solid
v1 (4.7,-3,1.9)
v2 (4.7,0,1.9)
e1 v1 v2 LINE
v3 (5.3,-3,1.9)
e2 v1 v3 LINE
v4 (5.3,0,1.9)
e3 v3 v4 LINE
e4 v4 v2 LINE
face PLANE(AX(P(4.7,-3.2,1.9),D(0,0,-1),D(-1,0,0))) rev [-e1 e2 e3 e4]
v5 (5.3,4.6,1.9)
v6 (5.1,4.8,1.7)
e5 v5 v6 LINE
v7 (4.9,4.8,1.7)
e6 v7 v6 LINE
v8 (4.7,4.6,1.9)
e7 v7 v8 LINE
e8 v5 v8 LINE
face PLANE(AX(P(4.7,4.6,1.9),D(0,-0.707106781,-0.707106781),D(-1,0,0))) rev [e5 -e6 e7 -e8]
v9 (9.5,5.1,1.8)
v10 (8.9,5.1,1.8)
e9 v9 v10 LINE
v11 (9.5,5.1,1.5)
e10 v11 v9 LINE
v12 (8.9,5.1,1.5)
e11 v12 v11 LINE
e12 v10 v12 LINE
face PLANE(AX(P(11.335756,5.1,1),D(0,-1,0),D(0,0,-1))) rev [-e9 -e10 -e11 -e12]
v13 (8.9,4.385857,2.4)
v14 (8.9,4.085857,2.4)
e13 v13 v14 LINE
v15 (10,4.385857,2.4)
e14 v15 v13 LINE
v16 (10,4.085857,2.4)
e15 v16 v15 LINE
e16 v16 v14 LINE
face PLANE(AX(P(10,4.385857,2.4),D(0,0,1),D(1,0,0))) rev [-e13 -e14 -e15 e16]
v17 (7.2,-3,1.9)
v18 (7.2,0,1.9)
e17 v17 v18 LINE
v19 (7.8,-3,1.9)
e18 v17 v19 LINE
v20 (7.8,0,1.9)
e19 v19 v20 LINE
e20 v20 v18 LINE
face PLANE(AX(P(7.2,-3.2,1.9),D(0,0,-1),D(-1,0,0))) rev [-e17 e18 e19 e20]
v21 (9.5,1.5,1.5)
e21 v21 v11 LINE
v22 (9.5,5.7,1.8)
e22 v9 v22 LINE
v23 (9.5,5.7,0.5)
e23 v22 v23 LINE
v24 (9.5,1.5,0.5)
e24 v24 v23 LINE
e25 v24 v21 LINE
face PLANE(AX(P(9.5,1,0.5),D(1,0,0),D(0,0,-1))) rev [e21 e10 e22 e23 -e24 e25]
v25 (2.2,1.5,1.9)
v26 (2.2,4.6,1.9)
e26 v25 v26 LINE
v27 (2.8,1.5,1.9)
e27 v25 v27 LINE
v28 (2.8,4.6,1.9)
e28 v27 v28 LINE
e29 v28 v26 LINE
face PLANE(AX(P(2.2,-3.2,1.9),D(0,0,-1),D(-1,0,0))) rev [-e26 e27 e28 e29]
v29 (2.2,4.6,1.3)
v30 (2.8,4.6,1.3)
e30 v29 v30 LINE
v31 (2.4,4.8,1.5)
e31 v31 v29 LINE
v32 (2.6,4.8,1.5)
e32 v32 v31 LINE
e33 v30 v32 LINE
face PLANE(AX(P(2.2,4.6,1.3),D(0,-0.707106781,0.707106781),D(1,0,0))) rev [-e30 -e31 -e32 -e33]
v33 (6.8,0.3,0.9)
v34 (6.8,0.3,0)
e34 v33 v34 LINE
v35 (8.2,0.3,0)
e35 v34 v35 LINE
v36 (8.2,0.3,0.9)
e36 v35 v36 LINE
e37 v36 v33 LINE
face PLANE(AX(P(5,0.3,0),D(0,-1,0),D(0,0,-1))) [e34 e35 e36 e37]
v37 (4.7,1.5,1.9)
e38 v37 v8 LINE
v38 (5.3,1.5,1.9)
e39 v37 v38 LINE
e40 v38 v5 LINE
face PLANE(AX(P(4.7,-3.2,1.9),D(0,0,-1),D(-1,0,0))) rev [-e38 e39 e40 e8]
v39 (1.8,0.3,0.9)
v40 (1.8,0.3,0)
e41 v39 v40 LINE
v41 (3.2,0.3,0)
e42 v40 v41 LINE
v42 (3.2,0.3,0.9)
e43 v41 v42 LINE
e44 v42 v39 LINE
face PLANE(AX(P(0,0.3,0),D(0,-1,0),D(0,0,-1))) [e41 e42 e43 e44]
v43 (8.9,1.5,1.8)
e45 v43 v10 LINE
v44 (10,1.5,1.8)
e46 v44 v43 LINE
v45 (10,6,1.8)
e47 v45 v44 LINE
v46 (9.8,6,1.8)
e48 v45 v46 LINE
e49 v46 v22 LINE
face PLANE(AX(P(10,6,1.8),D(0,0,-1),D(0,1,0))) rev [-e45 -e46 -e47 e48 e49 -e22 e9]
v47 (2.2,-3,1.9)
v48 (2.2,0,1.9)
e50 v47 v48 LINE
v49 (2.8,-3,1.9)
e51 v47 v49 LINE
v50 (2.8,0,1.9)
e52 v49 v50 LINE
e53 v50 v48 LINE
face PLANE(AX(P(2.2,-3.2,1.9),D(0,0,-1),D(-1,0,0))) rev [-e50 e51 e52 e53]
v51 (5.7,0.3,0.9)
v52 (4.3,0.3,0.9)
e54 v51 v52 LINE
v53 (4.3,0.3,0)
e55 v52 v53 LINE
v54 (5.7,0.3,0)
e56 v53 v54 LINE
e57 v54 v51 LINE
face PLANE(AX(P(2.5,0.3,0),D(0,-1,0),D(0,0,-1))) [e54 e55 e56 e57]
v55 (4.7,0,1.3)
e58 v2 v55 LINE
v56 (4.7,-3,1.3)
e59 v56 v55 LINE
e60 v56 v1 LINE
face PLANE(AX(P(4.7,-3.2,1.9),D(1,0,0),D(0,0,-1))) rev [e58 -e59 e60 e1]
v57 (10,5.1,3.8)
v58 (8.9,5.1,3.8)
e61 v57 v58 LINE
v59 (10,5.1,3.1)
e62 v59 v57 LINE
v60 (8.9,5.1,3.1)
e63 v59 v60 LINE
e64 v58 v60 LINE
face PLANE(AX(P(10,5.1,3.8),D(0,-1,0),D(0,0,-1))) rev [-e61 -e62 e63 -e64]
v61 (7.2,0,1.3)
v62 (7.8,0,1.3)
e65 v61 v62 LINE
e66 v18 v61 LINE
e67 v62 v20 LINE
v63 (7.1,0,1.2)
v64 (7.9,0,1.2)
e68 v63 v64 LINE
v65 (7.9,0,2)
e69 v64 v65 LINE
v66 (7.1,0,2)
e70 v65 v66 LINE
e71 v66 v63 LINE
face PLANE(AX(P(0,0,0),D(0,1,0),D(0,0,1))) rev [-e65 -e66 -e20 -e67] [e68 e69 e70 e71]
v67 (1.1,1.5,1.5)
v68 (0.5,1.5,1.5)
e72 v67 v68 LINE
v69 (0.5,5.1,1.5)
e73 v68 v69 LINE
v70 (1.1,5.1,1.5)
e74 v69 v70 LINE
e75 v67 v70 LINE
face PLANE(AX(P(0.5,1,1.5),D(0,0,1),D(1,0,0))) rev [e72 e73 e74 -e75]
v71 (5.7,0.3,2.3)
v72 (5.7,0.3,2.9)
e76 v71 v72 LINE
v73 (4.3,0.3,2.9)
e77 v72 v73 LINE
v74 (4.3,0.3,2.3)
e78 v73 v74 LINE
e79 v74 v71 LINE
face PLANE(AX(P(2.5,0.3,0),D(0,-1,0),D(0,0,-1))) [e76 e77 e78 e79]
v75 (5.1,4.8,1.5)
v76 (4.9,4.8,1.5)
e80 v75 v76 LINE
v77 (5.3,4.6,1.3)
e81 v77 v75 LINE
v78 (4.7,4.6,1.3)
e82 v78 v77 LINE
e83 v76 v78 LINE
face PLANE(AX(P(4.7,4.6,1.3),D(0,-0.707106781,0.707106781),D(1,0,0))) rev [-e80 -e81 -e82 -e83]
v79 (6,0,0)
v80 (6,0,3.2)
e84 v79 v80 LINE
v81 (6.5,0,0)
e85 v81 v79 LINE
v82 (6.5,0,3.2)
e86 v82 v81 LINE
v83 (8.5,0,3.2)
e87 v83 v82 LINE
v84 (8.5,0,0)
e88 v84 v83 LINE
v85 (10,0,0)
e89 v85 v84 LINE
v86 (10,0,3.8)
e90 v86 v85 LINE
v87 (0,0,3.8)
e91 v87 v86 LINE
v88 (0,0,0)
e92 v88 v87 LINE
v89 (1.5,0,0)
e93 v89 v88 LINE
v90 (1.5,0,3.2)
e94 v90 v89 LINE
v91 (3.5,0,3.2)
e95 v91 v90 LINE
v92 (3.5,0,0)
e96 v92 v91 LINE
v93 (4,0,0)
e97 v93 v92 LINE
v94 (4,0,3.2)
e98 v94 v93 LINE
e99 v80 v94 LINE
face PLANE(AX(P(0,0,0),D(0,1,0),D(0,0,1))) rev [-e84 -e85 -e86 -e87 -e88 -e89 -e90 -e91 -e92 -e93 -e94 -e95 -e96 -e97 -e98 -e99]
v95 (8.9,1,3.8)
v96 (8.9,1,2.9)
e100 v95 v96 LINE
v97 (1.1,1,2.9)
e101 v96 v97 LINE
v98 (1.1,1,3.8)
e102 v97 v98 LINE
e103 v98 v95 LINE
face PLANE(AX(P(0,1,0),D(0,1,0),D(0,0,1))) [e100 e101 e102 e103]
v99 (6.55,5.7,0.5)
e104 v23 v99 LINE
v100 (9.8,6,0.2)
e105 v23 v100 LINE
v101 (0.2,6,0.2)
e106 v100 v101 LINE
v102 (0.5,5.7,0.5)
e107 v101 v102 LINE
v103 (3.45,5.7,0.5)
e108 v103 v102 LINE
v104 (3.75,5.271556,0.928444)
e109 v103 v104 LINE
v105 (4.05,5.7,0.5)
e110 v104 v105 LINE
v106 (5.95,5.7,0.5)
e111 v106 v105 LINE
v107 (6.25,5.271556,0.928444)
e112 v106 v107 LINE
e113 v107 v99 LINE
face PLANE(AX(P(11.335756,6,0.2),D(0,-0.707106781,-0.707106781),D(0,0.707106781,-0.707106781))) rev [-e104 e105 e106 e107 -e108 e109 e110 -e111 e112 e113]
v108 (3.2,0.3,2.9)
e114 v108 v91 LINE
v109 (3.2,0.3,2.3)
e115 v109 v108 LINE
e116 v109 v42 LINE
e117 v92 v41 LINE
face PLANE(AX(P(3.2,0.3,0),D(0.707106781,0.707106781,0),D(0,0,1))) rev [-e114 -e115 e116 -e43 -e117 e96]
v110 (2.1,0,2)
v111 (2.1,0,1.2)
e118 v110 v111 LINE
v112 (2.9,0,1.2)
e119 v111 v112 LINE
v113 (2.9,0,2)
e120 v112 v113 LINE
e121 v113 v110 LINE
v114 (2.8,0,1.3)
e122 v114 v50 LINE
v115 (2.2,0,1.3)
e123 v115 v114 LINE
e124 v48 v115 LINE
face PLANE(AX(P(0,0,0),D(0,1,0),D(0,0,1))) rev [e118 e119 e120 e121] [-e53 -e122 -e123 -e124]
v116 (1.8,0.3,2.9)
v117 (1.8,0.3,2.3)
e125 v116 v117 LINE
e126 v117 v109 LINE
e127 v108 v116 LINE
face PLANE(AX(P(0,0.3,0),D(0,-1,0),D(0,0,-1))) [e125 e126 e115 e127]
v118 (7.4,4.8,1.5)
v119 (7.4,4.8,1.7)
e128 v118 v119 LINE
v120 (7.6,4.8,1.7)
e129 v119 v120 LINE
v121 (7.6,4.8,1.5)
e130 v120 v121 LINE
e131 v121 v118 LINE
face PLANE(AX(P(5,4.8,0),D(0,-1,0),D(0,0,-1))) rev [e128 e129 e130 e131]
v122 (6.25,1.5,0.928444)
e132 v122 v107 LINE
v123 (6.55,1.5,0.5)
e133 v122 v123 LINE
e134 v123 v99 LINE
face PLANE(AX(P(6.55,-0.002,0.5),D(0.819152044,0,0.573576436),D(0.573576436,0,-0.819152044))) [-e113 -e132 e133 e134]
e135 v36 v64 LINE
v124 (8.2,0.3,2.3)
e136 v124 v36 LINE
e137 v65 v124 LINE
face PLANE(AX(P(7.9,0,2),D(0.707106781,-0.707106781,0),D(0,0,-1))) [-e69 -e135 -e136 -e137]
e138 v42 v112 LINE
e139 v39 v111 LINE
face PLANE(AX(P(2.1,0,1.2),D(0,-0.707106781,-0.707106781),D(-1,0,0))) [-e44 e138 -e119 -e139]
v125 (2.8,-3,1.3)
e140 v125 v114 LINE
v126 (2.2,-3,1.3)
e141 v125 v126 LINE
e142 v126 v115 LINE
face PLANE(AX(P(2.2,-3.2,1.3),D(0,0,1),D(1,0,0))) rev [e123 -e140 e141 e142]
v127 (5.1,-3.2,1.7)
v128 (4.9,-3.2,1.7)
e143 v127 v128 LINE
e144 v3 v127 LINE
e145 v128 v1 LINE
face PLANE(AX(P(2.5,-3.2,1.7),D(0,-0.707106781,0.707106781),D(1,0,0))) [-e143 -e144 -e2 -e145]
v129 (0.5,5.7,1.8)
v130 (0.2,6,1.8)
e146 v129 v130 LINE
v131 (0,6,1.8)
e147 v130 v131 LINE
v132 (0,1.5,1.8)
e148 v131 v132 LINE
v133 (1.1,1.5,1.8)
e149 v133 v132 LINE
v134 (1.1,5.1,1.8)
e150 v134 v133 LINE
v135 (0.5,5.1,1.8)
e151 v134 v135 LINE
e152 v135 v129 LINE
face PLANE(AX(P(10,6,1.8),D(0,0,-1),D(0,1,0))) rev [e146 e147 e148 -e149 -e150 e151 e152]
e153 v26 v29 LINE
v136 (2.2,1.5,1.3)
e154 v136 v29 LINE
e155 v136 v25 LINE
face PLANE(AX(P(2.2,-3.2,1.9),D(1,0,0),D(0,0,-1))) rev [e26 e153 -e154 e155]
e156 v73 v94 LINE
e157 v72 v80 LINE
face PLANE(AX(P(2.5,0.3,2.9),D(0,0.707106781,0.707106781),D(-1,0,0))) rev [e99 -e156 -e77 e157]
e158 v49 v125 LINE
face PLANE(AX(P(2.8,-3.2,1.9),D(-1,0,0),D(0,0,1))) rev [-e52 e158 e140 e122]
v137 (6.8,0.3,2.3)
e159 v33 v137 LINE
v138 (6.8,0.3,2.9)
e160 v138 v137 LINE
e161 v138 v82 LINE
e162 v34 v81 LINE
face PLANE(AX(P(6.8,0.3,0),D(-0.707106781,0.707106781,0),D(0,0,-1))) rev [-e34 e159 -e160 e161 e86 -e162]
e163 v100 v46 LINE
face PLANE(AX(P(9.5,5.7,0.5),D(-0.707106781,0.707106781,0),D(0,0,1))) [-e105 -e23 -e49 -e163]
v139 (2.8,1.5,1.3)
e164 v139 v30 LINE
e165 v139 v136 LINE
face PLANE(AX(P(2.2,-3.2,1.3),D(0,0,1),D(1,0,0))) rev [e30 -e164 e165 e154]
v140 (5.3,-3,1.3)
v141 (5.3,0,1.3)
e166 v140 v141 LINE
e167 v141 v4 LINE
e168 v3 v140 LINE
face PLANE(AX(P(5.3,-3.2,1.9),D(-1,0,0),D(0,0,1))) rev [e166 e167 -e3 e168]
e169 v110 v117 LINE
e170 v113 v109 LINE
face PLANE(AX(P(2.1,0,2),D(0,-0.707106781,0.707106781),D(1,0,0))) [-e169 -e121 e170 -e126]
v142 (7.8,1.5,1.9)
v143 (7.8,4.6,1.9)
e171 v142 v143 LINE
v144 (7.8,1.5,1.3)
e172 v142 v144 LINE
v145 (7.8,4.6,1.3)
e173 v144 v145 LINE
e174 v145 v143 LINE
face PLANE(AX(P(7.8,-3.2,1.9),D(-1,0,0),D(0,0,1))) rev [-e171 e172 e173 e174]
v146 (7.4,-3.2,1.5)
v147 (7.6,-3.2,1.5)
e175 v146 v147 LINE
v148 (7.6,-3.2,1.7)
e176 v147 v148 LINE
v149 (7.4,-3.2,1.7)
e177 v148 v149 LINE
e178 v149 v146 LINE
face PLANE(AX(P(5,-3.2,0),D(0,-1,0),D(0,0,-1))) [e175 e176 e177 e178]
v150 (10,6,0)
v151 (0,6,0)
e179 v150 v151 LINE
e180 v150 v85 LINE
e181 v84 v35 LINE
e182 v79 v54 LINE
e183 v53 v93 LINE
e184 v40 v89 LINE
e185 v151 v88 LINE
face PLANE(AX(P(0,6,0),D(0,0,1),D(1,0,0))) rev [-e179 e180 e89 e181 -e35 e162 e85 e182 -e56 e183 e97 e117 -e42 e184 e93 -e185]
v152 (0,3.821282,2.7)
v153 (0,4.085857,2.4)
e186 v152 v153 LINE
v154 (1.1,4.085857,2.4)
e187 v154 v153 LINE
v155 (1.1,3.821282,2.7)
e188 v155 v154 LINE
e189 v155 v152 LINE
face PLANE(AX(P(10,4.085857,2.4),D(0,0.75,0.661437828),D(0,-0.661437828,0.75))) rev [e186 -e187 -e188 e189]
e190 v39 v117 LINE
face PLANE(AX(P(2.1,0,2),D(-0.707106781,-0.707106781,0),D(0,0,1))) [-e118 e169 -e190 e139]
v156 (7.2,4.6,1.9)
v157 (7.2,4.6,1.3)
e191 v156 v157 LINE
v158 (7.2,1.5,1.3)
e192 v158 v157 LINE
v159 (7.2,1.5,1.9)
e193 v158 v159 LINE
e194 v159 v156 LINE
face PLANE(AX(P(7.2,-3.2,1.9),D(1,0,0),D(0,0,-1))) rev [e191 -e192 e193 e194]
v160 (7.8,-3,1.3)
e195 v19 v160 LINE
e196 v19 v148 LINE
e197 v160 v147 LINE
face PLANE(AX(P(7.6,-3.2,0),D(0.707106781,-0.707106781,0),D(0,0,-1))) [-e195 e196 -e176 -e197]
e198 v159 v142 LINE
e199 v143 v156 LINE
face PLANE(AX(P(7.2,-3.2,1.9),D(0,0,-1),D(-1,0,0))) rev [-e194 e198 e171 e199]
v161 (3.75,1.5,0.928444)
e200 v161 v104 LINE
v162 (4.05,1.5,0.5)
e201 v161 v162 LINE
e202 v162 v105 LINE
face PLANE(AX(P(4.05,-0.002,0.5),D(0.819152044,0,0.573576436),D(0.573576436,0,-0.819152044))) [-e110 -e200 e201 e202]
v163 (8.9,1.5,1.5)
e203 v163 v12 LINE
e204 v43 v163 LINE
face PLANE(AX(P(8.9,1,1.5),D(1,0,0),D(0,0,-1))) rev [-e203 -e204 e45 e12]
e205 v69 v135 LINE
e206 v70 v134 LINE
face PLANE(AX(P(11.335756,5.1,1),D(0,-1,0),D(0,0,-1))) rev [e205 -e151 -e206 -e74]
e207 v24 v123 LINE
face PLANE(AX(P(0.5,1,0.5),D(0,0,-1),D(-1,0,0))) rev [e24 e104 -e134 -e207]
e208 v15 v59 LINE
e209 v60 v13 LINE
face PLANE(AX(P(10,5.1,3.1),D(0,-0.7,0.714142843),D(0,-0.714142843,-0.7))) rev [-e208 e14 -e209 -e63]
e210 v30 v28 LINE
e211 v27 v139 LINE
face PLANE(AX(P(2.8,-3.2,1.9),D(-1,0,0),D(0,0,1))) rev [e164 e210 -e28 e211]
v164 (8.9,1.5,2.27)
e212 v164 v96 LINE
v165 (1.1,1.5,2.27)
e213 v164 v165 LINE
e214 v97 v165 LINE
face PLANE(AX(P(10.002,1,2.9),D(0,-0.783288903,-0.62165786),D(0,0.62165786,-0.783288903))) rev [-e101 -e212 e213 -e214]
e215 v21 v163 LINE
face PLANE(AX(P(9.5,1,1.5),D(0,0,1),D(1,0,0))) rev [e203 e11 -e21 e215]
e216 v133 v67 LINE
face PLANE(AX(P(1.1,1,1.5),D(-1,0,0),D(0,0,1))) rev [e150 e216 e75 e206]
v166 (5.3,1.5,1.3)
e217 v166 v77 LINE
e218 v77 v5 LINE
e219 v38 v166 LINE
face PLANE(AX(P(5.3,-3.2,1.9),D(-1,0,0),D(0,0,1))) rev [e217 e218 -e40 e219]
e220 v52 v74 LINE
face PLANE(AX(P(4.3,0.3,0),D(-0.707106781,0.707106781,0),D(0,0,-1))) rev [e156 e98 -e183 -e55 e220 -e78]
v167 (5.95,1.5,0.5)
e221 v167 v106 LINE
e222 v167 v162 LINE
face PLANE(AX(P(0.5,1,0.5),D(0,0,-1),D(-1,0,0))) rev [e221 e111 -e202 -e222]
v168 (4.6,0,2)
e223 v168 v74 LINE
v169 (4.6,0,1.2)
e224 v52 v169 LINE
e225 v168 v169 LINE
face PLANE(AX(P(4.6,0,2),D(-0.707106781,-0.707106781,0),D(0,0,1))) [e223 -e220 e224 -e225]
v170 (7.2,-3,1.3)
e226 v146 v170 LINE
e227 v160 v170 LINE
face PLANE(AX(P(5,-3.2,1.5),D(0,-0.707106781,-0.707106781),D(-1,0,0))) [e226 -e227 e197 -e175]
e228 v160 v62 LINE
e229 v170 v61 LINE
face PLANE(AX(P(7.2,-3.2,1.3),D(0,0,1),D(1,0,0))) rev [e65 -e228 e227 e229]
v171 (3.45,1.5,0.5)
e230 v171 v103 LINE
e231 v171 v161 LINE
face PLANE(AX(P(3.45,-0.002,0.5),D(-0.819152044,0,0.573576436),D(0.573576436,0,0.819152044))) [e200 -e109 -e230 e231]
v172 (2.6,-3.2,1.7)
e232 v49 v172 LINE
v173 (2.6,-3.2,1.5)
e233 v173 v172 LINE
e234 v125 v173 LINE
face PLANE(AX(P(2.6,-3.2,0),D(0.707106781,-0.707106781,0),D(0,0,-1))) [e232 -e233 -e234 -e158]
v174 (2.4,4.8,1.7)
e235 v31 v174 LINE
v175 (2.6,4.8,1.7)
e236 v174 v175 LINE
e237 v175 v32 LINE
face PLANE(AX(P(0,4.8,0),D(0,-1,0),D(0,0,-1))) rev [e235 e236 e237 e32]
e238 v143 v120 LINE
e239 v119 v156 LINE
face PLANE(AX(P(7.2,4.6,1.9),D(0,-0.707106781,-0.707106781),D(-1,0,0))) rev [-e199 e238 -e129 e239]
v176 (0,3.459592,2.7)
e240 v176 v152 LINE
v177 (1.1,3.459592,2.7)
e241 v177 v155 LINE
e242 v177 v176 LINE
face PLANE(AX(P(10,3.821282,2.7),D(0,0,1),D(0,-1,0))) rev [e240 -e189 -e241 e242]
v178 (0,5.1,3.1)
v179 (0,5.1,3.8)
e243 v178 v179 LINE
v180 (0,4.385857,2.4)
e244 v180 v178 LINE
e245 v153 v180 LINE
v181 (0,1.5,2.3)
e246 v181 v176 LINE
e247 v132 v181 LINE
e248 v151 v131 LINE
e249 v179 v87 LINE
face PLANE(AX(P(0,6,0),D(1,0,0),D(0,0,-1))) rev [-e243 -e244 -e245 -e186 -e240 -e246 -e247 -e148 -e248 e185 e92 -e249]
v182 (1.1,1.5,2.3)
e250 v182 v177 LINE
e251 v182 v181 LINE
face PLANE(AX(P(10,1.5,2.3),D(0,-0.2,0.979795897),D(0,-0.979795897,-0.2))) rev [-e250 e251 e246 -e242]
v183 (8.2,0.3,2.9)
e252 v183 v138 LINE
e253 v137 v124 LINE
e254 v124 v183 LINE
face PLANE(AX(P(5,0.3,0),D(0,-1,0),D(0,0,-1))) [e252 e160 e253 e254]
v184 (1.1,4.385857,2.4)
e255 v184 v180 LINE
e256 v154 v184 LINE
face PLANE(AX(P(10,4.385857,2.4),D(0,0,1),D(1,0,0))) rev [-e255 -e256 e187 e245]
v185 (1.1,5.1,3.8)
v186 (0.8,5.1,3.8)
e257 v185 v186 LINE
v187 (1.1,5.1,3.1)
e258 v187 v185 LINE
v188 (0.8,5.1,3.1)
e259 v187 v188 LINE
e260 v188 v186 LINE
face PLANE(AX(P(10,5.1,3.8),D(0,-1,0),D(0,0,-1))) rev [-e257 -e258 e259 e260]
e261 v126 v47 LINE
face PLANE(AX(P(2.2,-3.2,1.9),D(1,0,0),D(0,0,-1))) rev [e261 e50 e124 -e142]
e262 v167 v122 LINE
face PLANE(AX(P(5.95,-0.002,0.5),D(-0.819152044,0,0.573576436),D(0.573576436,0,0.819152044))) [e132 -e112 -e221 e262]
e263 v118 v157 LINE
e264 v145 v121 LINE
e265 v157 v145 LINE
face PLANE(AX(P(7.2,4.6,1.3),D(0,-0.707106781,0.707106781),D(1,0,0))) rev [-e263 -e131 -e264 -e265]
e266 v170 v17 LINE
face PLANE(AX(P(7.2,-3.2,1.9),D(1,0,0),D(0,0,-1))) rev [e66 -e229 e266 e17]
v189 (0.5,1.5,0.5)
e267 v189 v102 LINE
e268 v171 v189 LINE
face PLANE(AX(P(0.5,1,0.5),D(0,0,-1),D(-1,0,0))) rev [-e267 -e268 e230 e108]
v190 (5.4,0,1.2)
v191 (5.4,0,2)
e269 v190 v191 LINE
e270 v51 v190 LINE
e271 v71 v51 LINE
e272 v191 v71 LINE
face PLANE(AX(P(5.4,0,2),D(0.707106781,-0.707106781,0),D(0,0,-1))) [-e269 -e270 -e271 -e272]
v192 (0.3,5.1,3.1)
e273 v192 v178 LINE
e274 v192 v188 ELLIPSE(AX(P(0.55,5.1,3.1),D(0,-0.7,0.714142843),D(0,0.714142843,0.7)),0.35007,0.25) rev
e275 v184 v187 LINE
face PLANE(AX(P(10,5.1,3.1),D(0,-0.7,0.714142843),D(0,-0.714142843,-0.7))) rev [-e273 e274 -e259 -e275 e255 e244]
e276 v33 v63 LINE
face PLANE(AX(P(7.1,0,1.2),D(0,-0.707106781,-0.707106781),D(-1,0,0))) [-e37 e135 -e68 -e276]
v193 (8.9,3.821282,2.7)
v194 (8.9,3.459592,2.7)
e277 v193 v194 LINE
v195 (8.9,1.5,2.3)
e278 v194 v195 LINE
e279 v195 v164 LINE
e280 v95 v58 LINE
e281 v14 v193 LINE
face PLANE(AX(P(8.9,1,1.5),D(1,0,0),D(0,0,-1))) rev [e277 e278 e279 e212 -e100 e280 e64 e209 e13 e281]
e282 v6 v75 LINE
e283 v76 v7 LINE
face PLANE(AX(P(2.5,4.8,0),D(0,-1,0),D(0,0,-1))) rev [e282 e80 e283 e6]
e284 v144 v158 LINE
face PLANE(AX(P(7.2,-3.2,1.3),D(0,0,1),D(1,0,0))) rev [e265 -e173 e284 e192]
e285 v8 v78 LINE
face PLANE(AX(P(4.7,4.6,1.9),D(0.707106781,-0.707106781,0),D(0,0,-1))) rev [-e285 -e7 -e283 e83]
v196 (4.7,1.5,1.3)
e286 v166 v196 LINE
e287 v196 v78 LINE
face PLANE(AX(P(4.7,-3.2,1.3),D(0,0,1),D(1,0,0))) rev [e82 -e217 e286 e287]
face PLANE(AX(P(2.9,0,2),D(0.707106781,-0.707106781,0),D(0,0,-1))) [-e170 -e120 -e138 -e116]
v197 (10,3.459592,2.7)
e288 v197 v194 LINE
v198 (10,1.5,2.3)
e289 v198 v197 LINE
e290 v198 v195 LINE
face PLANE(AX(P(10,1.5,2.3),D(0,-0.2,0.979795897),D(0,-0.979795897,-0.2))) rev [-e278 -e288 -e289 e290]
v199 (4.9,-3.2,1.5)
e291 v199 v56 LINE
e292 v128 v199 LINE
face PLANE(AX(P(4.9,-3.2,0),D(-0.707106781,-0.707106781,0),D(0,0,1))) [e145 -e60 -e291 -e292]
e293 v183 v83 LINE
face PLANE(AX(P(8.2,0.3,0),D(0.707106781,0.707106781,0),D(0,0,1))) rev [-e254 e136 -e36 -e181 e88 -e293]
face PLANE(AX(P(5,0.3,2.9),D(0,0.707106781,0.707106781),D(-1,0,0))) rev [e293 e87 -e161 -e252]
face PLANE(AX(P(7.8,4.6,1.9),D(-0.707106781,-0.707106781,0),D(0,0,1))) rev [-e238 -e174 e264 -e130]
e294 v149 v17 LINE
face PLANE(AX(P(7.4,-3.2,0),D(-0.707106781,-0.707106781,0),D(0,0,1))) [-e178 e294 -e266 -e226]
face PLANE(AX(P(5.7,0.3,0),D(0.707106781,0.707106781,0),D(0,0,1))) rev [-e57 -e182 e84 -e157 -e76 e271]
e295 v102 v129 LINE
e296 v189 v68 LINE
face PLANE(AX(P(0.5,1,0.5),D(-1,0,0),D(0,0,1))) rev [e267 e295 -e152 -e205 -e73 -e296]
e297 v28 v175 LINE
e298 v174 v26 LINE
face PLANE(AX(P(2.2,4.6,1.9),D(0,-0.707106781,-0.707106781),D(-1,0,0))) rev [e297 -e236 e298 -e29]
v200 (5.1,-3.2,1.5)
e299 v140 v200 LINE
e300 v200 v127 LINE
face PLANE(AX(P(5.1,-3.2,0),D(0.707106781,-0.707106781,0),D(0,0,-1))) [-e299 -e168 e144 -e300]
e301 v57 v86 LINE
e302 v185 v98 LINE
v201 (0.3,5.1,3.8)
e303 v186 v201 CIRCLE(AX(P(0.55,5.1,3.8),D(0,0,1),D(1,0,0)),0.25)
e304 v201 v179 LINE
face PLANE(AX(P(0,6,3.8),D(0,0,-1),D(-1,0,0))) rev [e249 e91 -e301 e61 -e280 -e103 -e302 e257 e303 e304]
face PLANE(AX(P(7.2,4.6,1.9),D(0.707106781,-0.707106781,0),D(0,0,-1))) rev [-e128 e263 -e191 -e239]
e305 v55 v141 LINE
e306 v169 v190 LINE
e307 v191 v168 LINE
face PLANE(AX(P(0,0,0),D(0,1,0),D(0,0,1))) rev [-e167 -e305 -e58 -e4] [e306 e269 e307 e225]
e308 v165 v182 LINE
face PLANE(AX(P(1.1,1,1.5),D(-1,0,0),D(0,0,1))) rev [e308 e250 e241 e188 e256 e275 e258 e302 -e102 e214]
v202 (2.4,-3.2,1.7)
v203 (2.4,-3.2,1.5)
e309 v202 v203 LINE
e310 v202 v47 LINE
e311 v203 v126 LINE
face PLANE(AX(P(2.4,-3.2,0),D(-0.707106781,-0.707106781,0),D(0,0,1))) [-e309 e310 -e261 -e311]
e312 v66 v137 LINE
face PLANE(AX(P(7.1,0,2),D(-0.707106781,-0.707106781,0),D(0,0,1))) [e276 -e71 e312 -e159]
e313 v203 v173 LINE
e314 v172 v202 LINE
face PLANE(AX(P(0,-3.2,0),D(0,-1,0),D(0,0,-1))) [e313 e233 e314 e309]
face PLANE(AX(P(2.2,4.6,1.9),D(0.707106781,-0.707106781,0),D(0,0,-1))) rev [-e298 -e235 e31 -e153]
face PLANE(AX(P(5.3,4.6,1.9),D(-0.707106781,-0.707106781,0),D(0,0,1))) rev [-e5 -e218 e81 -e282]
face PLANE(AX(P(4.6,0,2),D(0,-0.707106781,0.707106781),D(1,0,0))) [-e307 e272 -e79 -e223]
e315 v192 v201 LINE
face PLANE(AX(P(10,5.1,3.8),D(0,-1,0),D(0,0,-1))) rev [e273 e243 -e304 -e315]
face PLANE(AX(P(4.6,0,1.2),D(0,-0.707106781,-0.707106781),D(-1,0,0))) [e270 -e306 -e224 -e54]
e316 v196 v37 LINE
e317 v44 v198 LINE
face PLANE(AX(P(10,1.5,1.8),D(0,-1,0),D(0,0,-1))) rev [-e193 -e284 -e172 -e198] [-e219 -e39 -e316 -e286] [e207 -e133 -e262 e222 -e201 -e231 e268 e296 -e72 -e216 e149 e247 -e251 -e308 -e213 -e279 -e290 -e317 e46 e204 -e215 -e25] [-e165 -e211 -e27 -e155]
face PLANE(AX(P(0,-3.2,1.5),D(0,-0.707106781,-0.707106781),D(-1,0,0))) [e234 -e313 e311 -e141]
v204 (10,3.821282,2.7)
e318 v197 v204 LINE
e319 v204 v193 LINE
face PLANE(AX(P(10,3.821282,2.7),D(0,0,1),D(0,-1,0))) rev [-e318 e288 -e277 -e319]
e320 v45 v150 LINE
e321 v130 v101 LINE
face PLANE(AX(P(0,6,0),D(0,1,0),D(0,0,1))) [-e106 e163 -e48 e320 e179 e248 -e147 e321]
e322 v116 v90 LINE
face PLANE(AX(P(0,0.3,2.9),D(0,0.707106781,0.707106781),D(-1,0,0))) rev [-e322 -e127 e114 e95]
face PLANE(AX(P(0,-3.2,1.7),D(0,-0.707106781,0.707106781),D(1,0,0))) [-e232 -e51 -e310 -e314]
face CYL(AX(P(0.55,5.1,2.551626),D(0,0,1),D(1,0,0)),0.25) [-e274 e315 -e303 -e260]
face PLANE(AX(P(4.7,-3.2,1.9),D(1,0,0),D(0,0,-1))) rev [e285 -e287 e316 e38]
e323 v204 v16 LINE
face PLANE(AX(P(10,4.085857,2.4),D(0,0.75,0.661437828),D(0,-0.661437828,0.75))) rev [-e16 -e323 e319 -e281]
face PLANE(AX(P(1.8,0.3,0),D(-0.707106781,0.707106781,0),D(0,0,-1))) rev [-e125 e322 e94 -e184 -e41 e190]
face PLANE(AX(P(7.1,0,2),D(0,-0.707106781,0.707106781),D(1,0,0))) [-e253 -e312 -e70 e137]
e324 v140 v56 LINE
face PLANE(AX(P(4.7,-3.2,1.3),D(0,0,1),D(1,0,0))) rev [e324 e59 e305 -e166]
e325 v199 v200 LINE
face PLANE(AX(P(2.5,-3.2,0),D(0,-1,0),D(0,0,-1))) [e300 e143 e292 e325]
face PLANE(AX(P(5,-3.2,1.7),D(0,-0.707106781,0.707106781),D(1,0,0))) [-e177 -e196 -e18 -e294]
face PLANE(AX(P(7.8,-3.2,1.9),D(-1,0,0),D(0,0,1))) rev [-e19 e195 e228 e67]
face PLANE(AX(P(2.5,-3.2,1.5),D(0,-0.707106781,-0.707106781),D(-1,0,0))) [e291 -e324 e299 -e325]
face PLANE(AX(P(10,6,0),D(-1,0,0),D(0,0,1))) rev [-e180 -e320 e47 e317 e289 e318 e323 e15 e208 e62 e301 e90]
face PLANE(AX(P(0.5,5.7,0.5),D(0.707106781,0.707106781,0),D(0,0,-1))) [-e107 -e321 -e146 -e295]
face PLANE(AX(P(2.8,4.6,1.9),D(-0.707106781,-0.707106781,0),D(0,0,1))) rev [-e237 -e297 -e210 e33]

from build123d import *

# Parameters (mm, degrees)
SKETCH_1_W                         = 10
SKETCH_1_H                         = 3.8
EXTRUDE_1_DEPTH                    = 6
CUT_EXTRUDE_1_DEPTH                = 5
CUT_EXTRUDE_2_DEPTH                = 13.265398485
EXTRUDE_2_REACH                    = 14.265
CUT_EXTRUDE_3_REACH                = 14.265
SKETCH_5_W                         = 7.8
SKETCH_5_H                         = 4.1
EXTRUDE_3_REACH                    = 13.861
EXTRUDE_5_REACH                    = 14.265
SKETCH_11_W                        = 2
SKETCH_11_H                        = 3.2
SKETCH_11_W_2                      = 0.8
SKETCH_11_H_2                      = 0.8
CUT_EXTRUDE_5_DEPTH                = 0.3
SKETCH_15_R                        = 0.05
CUT_EXTRUDE_6_DEPTH                = 0.1
CHAMFER_7_SIZE                     = 0.3
PATTERN_LINEAR_2_COUNT             = 2
PATTERN_LINEAR_2_PITCH             = 2.5
EXTRUDE_START                      = -4.8
SKETCH_7_W                         = 0.6
SKETCH_7_H                         = 0.6
EXTRUDE_4_DEPTH                    = 8
CHAMFER_6_SIZE                     = 0.2
PATTERN_LINEAR_1_COUNT             = 3
PATTERN_LINEAR_1_PITCH             = 2.5
CHAMFER_7_OF_PATTERN_LINEAR_1_SIZE = 0.3
CHAMFER_6_OF_PATTERN_LINEAR_1_SIZE = 0.2
CUT_EXTRUDE_4_REACH                = 13.861
CHAMFER_5_SIZE                     = 0.3


with BuildPart() as part:
    # Эскиз1 → Бобышка-Вытянуть1 (new body)
    with BuildSketch(Plane(origin=(0, 0, 0), x_dir=(1, 0, 0), z_dir=(0, 1, 0))):
        with Locations((5, -1.9)):
            Rectangle(SKETCH_1_W, SKETCH_1_H)
    extrude(amount=EXTRUDE_1_DEPTH)

    # Эскиз2 → Вырез-Вытянуть1 (cut)
    with BuildSketch(Plane(origin=(0, 6, 0), x_dir=(1, 0, 0), z_dir=(0, 1, 0))):
        Polygon((0.5, -0.5), (9.5, -0.5), (9.5, -1.5), (8.9, -1.5), (8.9, -3.3), (1.1, -3.3), (1.1, -1.5), (0.5, -1.5), align=None)
    extrude(amount=-CUT_EXTRUDE_1_DEPTH, mode=Mode.SUBTRACT)

    # Эскиз3 → Вырез-Вытянуть2 (cut, through all)
    with BuildSketch(Plane.ZY):
        Polygon((1.8, 6), (1.8, 1.5), (2.3, 1.5), (2.7, 3.459591794), (2.7, 3.821282026), (2.4, 4.085857157), (2.4, 4.385857157), (3.1, 5.1), (3.8, 5.1), (3.8, 6), align=None)
    extrude(amount=-CUT_EXTRUDE_2_DEPTH, mode=Mode.SUBTRACT)

    # Бобышка-Вытянуть2: up to this plane
    extrude_2_end = Plane(origin=(10, 5.1, 3.1), z_dir=(0, -0.6999999999999996, 0.7141428428542854))
    # Эскиз4 → Бобышка-Вытянуть2 (add, up to the surface)
    with BuildSketch(Plane.XY.offset(3.8), mode=Mode.PRIVATE) as extrude_2_sk1:
        with BuildLine():
            Line((0.3, 5.1), (0.8, 5.1))
            ThreePointArc((0.8, 5.1), (0.55, 5.35), (0.3, 5.1))
        make_face()
    extrude_2_tool1 = split(extrude(extrude_2_sk1.sketch, amount=-EXTRUDE_2_REACH, mode=Mode.PRIVATE), bisect_by=extrude_2_end, keep=Keep.BOTH, mode=Mode.PRIVATE)
    add(extrude_2_tool1.solids().sort_by_distance((0.55, 5.206103, 3.8))[0])

    # Эскиз5 → Вырез-Вытянуть3 (cut, up to next)
    with BuildSketch(Plane.XY.offset(3.8), mode=Mode.PRIVATE) as cut_extrude_3_sk1:
        with Locations((5, 3.05)):
            Rectangle(SKETCH_5_W, SKETCH_5_H)
    cut_extrude_3_tool1 = extrude(cut_extrude_3_sk1.sketch, amount=-CUT_EXTRUDE_3_REACH, mode=Mode.PRIVATE) & part.part
    add(cut_extrude_3_tool1.solids().sort_by_distance((5, 3.05, 3.8))[0], mode=Mode.SUBTRACT)

    # Эскиз6 → Бобышка-Вытянуть3 (add, up to next)
    with BuildSketch(Plane(origin=(0.5, 0, 0), x_dir=(0, 0, -1), z_dir=(1, 0, 0)), mode=Mode.PRIVATE) as extrude_3_sk1:
        Polygon((-2.9, 1), (-2.27, 1.5), (-0.5, 1.5), (-0.5, 1), align=None)
    extrude_3_tool1 = extrude(extrude_3_sk1.sketch, amount=EXTRUDE_3_REACH, mode=Mode.PRIVATE) - part.part
    add(extrude_3_tool1.solids().sort_by_distance((0.5, 1.23741, 1.550432))[0])

    # Эскиз9 → Бобышка-Вытянуть5 (add, up to next)
    with BuildSketch(Plane(origin=(0, 6, 0), x_dir=(1, 0, 0), z_dir=(0, 1, 0)), mode=Mode.PRIVATE) as extrude_5_sk1:
        Polygon((3.45, -0.5), (3.75, -0.928444402), (4.05, -0.5), align=None)
    extrude_5_tool1 = extrude(extrude_5_sk1.sketch, amount=-EXTRUDE_5_REACH, mode=Mode.PRIVATE) - part.part
    extrude_5 = extrude_5_tool1.solids().sort_by_distance((3.75, 6, 0.642815))[0]
    add(extrude_5)

    # Эскиз11 → Вырез-Вытянуть5 (cut)
    with BuildSketch(Plane.XZ):
        with Locations((2.5, 1.6)):
            Rectangle(SKETCH_11_W, SKETCH_11_H)
        with Locations((2.5, 1.6)):
            Rectangle(SKETCH_11_W_2, SKETCH_11_H_2, mode=Mode.SUBTRACT)
    cut_extrude_5 = extrude(amount=-CUT_EXTRUDE_5_DEPTH, mode=Mode.SUBTRACT)

    # Эскиз15 → Вырез-Вытянуть6 (cut)
    with BuildSketch(Plane.XZ):
        with Locations(Location((2.5, 1.6, 0), (0, 0, 270))):
            Circle(SKETCH_15_R)
    extrude(amount=-CUT_EXTRUDE_6_DEPTH, mode=Mode.SUBTRACT)

    # Фаска7
    chamfer_7_edges = [part.edges().sort_by_distance(p)[0] for p in [
        (1.5, 0.3, 1.6),
        (2.5, 0.3, 3.2),
        (3.5, 0.3, 1.6),
        (2.9, 0.3, 1.6),
        (2.5, 0.3, 2),
        (2.1, 0.3, 1.6),
        (2.5, 0.3, 1.2),
    ]]
    chamfer(chamfer_7_edges, length=CHAMFER_7_SIZE - 0.0001)  # a hair under: the kernel refuses the full size

    # Линейный массив2: Бобышка-Вытянуть5 ×2
    with Locations(*[(i * PATTERN_LINEAR_2_PITCH, 0, 0) for i in range(1, PATTERN_LINEAR_2_COUNT)]):
        add(extrude_5)

    # Эскиз7 → Бобышка-Вытянуть4 (add)
    with BuildSketch(Plane.XZ.offset(EXTRUDE_START)):
        with Locations((2.5, 1.6)):
            Rectangle(SKETCH_7_W, SKETCH_7_H)
    extrude_4 = extrude(amount=EXTRUDE_4_DEPTH)

    # Фаска6
    chamfer_6_edges = [part.edges().sort_by_distance(p)[0] for p in [
        (2.8, 4.8, 1.6),
        (2.5, 4.8, 1.9),
        (2.2, 4.8, 1.6),
        (2.5, 4.8, 1.3),
        (2.8, -3.2, 1.6),
        (2.5, -3.2, 1.9),
        (2.2, -3.2, 1.6),
        (2.5, -3.2, 1.3),
    ]]
    chamfer(chamfer_6_edges, length=CHAMFER_6_SIZE)

    # Линейный массив1: Вырез-Вытянуть5, Бобышка-Вытянуть4 ×3
    with Locations(*[(i * PATTERN_LINEAR_1_PITCH, 0, 0) for i in range(1, PATTERN_LINEAR_1_COUNT)]):
        add(cut_extrude_5, mode=Mode.SUBTRACT)
        add(extrude_4)

    # Фаска7 of Линейный массив1
    chamfer_7_of_pattern_linear_1_edges = [part.edges().sort_by_distance(p)[0] for p in [
        (4, 0.3, 1.6),
        (5, 0.3, 3.2),
        (6, 0.3, 1.6),
        (5.4, 0.3, 1.6),
        (5, 0.3, 2),
        (4.6, 0.3, 1.6),
        (5, 0.3, 1.2),
        (6.5, 0.3, 1.6),
        (7.5, 0.3, 3.2),
        (8.5, 0.3, 1.6),
        (7.9, 0.3, 1.6),
        (7.5, 0.3, 2),
        (7.1, 0.3, 1.6),
        (7.5, 0.3, 1.2),
    ]]
    chamfer(chamfer_7_of_pattern_linear_1_edges, length=CHAMFER_7_OF_PATTERN_LINEAR_1_SIZE - 0.0001)  # a hair under: the kernel refuses the full size

    # Фаска6 of Линейный массив1
    chamfer_6_of_pattern_linear_1_edges = [part.edges().sort_by_distance(p)[0] for p in [
        (5.3, 4.8, 1.6),
        (5, 4.8, 1.9),
        (4.7, 4.8, 1.6),
        (5, 4.8, 1.3),
        (5.3, -3.2, 1.6),
        (5, -3.2, 1.9),
        (4.7, -3.2, 1.6),
        (5, -3.2, 1.3),
        (7.8, 4.8, 1.6),
        (7.5, 4.8, 1.9),
        (7.2, 4.8, 1.6),
        (7.5, 4.8, 1.3),
        (7.8, -3.2, 1.6),
        (7.5, -3.2, 1.9),
        (7.2, -3.2, 1.6),
        (7.5, -3.2, 1.3),
    ]]
    chamfer(chamfer_6_of_pattern_linear_1_edges, length=CHAMFER_6_OF_PATTERN_LINEAR_1_SIZE)

    # Вырез-Вытянуть4: up to this face of the body (flat: up to its plane)
    cut_extrude_4_end = Plane(part.part.faces().sort_by_distance((9.5, 3.75, 1))[0])
    # Эскиз10 → Вырез-Вытянуть4 (cut, up to the picked face)
    with BuildSketch(Plane(origin=(0.5, 0, 0), x_dir=(0, 0, -1), z_dir=(1, 0, 0)), mode=Mode.PRIVATE) as cut_extrude_4_sk1:
        Polygon((-1, 6), (-0.2, 6), (-1, 5.2), (-1, 5.1), (-1.8, 5.1), (-1.8, 6), align=None)
    cut_extrude_4_tool1 = split(extrude(cut_extrude_4_sk1.sketch, amount=CUT_EXTRUDE_4_REACH, mode=Mode.PRIVATE), bisect_by=cut_extrude_4_end, keep=Keep.BOTH, mode=Mode.PRIVATE)
    add(cut_extrude_4_tool1.solids().sort_by(Axis((0.5, 5.60641, 1.194872), (1, 0, 0)))[0], mode=Mode.SUBTRACT)

    # Фаска5
    chamfer_5_edges = [part.edges().sort_by_distance(p)[0] for p in [
        (9.5, 6, 1),
        (0.5, 6, 1),
    ]]
    chamfer(chamfer_5_edges, length=CHAMFER_5_SIZE)


solid = part.part
